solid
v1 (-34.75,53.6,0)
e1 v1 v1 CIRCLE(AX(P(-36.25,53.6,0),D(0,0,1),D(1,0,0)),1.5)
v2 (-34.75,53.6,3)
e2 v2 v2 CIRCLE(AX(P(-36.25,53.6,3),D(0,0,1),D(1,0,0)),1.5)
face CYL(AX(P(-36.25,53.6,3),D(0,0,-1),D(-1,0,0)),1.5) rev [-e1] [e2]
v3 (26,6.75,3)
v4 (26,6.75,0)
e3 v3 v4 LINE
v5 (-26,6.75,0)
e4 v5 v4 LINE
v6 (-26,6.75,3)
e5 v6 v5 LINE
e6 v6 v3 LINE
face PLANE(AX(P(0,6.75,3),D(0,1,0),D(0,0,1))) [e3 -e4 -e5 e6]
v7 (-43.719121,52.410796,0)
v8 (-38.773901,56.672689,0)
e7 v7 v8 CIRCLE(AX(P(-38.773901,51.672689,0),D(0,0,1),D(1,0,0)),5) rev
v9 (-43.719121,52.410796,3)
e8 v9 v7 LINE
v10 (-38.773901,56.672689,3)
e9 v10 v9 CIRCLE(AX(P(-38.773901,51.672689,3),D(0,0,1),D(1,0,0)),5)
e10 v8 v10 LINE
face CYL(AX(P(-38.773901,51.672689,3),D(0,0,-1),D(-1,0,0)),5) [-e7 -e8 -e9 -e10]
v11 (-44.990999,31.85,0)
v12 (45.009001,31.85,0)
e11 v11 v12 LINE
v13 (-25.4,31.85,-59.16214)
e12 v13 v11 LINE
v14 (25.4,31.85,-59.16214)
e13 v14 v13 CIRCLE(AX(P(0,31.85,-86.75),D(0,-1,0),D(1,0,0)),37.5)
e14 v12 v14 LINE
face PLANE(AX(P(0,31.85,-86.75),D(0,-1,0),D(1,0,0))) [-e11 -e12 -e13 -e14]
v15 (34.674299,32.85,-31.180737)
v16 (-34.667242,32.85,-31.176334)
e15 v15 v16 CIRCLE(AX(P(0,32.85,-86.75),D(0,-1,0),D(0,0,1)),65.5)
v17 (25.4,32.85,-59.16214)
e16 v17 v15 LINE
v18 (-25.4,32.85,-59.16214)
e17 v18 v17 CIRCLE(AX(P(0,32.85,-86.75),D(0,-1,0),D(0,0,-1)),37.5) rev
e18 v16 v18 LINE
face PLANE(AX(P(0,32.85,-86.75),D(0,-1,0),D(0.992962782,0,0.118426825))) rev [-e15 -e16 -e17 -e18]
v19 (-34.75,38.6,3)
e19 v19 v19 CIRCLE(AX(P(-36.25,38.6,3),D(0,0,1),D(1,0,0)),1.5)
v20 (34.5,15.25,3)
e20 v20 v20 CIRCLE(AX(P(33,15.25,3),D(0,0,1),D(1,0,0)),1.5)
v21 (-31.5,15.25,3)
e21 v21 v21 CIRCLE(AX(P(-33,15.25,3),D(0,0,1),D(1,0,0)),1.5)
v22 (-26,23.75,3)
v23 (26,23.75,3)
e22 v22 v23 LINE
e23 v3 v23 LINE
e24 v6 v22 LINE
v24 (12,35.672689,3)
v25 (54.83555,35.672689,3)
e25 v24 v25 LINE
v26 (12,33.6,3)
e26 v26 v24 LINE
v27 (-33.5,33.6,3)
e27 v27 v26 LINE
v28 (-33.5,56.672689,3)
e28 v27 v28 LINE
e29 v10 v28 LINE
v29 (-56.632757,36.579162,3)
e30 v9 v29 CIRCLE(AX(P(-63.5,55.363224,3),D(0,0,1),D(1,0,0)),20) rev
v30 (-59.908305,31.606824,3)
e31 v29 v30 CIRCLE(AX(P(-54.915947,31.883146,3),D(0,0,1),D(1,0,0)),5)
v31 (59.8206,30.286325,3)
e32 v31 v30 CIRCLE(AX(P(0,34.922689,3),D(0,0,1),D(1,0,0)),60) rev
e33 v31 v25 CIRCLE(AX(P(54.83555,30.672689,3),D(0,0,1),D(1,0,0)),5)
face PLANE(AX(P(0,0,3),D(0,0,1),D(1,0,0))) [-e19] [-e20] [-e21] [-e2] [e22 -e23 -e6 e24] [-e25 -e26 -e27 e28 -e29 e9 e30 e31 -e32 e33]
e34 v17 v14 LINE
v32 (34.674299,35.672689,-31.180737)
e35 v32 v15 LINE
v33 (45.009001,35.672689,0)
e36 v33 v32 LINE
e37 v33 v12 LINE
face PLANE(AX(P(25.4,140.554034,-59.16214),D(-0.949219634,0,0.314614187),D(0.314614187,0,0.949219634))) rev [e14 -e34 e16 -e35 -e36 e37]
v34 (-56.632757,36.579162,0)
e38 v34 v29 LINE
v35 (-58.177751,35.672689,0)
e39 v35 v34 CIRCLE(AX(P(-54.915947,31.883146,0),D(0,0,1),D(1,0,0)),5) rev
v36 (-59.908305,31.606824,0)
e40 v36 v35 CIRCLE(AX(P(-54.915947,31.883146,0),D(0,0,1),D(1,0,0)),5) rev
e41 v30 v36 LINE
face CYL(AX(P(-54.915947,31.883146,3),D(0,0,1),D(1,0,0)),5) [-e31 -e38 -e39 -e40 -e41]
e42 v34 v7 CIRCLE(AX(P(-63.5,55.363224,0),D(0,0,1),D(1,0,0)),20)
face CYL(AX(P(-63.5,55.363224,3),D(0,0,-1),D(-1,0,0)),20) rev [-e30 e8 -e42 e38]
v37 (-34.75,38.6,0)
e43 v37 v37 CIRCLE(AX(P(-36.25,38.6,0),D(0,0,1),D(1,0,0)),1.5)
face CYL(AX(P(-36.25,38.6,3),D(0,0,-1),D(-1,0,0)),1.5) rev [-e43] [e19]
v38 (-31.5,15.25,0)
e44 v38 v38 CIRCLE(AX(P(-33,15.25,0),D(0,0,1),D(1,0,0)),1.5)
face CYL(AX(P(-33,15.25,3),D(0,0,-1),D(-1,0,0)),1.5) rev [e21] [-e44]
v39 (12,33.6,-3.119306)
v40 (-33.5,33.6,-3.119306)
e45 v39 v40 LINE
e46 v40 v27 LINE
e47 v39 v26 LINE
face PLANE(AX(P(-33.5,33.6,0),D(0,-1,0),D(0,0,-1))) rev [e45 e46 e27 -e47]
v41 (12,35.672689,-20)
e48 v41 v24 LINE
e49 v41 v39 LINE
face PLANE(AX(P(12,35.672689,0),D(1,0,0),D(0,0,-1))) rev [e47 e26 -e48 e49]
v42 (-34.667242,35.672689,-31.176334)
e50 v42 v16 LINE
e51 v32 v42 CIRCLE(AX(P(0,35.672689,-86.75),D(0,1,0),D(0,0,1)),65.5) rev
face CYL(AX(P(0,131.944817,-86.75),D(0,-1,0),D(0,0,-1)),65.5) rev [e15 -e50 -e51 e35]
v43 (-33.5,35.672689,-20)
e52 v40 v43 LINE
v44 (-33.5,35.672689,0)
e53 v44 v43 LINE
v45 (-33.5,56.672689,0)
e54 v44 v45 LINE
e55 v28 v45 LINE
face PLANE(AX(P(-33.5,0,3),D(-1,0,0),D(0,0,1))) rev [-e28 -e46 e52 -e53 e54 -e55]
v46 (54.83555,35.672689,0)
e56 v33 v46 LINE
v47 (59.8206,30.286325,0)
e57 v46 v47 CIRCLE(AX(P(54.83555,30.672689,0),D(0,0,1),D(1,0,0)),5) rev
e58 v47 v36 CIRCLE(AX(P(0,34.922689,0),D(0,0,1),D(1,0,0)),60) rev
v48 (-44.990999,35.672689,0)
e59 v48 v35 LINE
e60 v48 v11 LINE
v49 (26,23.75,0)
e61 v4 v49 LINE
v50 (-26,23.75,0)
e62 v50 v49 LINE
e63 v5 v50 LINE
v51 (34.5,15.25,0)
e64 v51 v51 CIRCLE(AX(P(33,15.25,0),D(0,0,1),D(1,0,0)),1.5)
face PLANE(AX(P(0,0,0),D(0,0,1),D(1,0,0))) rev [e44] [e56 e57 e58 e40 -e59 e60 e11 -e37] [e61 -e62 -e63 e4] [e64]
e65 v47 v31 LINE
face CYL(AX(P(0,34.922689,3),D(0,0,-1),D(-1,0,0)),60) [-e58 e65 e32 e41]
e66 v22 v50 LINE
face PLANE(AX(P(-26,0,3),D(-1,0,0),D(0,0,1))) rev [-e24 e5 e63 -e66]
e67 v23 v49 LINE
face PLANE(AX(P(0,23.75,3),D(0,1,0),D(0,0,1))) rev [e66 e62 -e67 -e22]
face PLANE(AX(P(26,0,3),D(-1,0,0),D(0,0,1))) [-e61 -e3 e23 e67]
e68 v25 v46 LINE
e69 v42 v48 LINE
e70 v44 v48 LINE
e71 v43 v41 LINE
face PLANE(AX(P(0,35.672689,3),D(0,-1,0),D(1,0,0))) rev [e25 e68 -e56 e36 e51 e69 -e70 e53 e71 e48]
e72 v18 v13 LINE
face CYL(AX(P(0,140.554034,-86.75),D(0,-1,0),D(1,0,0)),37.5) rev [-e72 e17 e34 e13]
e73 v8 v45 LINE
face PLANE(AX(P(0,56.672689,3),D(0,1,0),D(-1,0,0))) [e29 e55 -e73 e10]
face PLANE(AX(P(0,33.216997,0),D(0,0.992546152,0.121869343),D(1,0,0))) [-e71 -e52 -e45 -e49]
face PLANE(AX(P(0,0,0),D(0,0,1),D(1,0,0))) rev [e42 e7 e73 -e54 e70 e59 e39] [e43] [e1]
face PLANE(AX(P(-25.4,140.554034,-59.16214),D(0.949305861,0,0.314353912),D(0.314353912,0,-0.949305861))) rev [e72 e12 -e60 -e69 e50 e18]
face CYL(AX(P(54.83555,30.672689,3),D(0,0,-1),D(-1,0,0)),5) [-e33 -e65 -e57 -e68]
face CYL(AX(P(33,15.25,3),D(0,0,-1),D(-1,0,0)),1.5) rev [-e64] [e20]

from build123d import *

# Parameters (mm, degrees)
SKETCH1_R           = 1.5
SKETCH1_W           = 52
SKETCH1_H           = 17
BOSS_EXTRUDE1_DEPTH = 3
BOSS_EXTRUDE2_DEPTH = 1
BOSS_EXTRUDE3_DEPTH = 2.822688649
FILLET1_R           = 20
FILLET3_R           = 5
SKETCH6_W           = 45.5
SKETCH6_H           = 2.072688649
CUT_EXTRUDE1_DEPTH  = 3
CHAMFER2_SIZE       = 20
CHAMFER2_SIZE_2     = 2.455691218


with BuildPart() as part:
    # Sketch1 → Boss-Extrude1 (new body)
    with BuildSketch(Plane.XY):
        with BuildLine():
            Line((-33.5, 56.672688649), (-43.5, 56.672688649))
            Line((-43.5, 56.672688649), (-43.5, 35.672688649))
            Line((-43.5, 35.672688649), (-59.995312317, 35.672688649))
            ThreePointArc((-59.995312317, 35.672688649), (-59.999578012, 34.697658936), (-59.9879988, 33.722688649))
            ThreePointArc((-59.9879988, 33.722688649), (0, -25.077311351), (59.9879988, 33.722688649))
            ThreePointArc((59.9879988, 33.722688649), (59.999578012, 34.697658936), (59.995312317, 35.672688649))
            Line((59.995312317, 35.672688649), (12, 35.672688649))
            Line((12, 35.672688649), (-33.5, 35.672688649))
            Line((-33.5, 35.672688649), (-33.5, 56.672688649))
        make_face()
        with Locations((-33, 15.25)):
            Circle(SKETCH1_R, mode=Mode.SUBTRACT)
        with Locations((0, 15.25)):
            Rectangle(SKETCH1_W, SKETCH1_H, mode=Mode.SUBTRACT)
        with Locations((33, 15.25)):
            Circle(SKETCH1_R, mode=Mode.SUBTRACT)
        with Locations((-36.25, 38.6)):
            Circle(SKETCH1_R, mode=Mode.SUBTRACT)
        with Locations((-36.25, 53.6)):
            Circle(SKETCH1_R, mode=Mode.SUBTRACT)
    extrude(amount=BOSS_EXTRUDE1_DEPTH)

    # Sketch4 → Boss-Extrude2 (add)
    with BuildSketch(Plane(origin=(0, 31.85, 0), x_dir=(1, 0, 0), z_dir=(0, 1, 0))):
        with BuildLine():
            Line((-25.4, 59.162140351), (-44.9909991, 0))
            Line((-44.9909991, 0), (45.0090009, 0))
            Line((45.0090009, 0), (25.4, 59.162140351))
            ThreePointArc((25.4, 59.162140351), (0, 49.25), (-25.4, 59.162140351))
        make_face()
    extrude(amount=BOSS_EXTRUDE2_DEPTH)

    # Sketch5 → Boss-Extrude3 (add)
    with BuildSketch(Plane(origin=(0, 32.85, 0), x_dir=(1, 0, 0), z_dir=(0, 1, 0))):
        with BuildLine():
            Line((-34.667242442, 31.176334461), (-44.9909991, 0))
            Line((-44.9909991, 0), (-44.9909991, -3))
            Line((-44.9909991, -3), (45.0090009, -3))
            Line((45.0090009, -3), (45.0090009, 0))
            Line((45.0090009, 0), (34.674298778, 31.180736875))
            ThreePointArc((34.674298778, 31.180736875), (0.004158519, 21.250000132), (-34.667242442, 31.176334461))
        make_face()
    extrude(amount=BOSS_EXTRUDE3_DEPTH)

    # Fillet1
    # the kernel refuses this fillet: 20 mm, written as the material it adds along each edge
    with BuildSketch(Plane(origin=(-43.5, 35.672688649, 0), x_dir=(0, 1, 0), z_dir=(0, 0, 1))) as fillet1_piece_1:
        with BuildLine():
            CenterArc((19.69053489, 20), FILLET1_R, 190.092298101, 79.907701899)
            Line((0, 16.495312317), (-0.393810698, 16.425218563))
            ThreePointArc((-0.393810698, 16.425218563), (-0.4, 8.247656158), (-0.4, 0))
            Line((-0.4, 0), (0, -0.4))
            Line((0, -0.4), (19.69053489, -0.4))
            Line((19.69053489, -0.4), (19.69053489, 0))
        make_face()
    extrude(amount=3)

    # Fillet3
    fillet3_edges = [part.edges().sort_by_distance(p)[0] for p in [
        (59.995312317, 35.672688649, 1.5),
        (-43.5, 56.672688649, 1.5),
        (-59.995312317, 35.672688649, 1.5),
    ]]
    fillet(fillet3_edges, radius=FILLET3_R)

    # Sketch6 → Cut-Extrude1 (cut)
    with BuildSketch(Plane.XY.offset(3)):
        with Locations((-10.75, 34.636344325)):
            Rectangle(SKETCH6_W, SKETCH6_H)
    extrude(amount=-CUT_EXTRUDE1_DEPTH, mode=Mode.SUBTRACT)

    # Chamfer2
    # the kernel refuses this chamfer: 20, 2.455691218 mm, written as the material it takes off along each edge
    with BuildSketch(Plane(origin=(-33.5, 35.672688649, 0), x_dir=(0, 0.00468857506979093, -0.9999890085715016), z_dir=(1, 0, 0))) as chamfer2_piece_1_section:
        Polygon((CHAMFER2_SIZE * 0.999989008572, -CHAMFER2_SIZE * 0.00468857506979), (-CHAMFER2_SIZE_2 * 0.0046885750699, -CHAMFER2_SIZE_2 * 0.999989008595), (0, 0), align=None)
    chamfer2_piece_1 = extrude(amount=45.5, mode=Mode.PRIVATE)
    chamfer2_piece_1 = split(chamfer2_piece_1, bisect_by=Plane(origin=(-10.75, 33.6, -6.806954436), z_dir=(0, 1, 0)), keep=Keep.TOP, mode=Mode.PRIVATE)
    add(chamfer2_piece_1, mode=Mode.SUBTRACT)


solid = part.part
